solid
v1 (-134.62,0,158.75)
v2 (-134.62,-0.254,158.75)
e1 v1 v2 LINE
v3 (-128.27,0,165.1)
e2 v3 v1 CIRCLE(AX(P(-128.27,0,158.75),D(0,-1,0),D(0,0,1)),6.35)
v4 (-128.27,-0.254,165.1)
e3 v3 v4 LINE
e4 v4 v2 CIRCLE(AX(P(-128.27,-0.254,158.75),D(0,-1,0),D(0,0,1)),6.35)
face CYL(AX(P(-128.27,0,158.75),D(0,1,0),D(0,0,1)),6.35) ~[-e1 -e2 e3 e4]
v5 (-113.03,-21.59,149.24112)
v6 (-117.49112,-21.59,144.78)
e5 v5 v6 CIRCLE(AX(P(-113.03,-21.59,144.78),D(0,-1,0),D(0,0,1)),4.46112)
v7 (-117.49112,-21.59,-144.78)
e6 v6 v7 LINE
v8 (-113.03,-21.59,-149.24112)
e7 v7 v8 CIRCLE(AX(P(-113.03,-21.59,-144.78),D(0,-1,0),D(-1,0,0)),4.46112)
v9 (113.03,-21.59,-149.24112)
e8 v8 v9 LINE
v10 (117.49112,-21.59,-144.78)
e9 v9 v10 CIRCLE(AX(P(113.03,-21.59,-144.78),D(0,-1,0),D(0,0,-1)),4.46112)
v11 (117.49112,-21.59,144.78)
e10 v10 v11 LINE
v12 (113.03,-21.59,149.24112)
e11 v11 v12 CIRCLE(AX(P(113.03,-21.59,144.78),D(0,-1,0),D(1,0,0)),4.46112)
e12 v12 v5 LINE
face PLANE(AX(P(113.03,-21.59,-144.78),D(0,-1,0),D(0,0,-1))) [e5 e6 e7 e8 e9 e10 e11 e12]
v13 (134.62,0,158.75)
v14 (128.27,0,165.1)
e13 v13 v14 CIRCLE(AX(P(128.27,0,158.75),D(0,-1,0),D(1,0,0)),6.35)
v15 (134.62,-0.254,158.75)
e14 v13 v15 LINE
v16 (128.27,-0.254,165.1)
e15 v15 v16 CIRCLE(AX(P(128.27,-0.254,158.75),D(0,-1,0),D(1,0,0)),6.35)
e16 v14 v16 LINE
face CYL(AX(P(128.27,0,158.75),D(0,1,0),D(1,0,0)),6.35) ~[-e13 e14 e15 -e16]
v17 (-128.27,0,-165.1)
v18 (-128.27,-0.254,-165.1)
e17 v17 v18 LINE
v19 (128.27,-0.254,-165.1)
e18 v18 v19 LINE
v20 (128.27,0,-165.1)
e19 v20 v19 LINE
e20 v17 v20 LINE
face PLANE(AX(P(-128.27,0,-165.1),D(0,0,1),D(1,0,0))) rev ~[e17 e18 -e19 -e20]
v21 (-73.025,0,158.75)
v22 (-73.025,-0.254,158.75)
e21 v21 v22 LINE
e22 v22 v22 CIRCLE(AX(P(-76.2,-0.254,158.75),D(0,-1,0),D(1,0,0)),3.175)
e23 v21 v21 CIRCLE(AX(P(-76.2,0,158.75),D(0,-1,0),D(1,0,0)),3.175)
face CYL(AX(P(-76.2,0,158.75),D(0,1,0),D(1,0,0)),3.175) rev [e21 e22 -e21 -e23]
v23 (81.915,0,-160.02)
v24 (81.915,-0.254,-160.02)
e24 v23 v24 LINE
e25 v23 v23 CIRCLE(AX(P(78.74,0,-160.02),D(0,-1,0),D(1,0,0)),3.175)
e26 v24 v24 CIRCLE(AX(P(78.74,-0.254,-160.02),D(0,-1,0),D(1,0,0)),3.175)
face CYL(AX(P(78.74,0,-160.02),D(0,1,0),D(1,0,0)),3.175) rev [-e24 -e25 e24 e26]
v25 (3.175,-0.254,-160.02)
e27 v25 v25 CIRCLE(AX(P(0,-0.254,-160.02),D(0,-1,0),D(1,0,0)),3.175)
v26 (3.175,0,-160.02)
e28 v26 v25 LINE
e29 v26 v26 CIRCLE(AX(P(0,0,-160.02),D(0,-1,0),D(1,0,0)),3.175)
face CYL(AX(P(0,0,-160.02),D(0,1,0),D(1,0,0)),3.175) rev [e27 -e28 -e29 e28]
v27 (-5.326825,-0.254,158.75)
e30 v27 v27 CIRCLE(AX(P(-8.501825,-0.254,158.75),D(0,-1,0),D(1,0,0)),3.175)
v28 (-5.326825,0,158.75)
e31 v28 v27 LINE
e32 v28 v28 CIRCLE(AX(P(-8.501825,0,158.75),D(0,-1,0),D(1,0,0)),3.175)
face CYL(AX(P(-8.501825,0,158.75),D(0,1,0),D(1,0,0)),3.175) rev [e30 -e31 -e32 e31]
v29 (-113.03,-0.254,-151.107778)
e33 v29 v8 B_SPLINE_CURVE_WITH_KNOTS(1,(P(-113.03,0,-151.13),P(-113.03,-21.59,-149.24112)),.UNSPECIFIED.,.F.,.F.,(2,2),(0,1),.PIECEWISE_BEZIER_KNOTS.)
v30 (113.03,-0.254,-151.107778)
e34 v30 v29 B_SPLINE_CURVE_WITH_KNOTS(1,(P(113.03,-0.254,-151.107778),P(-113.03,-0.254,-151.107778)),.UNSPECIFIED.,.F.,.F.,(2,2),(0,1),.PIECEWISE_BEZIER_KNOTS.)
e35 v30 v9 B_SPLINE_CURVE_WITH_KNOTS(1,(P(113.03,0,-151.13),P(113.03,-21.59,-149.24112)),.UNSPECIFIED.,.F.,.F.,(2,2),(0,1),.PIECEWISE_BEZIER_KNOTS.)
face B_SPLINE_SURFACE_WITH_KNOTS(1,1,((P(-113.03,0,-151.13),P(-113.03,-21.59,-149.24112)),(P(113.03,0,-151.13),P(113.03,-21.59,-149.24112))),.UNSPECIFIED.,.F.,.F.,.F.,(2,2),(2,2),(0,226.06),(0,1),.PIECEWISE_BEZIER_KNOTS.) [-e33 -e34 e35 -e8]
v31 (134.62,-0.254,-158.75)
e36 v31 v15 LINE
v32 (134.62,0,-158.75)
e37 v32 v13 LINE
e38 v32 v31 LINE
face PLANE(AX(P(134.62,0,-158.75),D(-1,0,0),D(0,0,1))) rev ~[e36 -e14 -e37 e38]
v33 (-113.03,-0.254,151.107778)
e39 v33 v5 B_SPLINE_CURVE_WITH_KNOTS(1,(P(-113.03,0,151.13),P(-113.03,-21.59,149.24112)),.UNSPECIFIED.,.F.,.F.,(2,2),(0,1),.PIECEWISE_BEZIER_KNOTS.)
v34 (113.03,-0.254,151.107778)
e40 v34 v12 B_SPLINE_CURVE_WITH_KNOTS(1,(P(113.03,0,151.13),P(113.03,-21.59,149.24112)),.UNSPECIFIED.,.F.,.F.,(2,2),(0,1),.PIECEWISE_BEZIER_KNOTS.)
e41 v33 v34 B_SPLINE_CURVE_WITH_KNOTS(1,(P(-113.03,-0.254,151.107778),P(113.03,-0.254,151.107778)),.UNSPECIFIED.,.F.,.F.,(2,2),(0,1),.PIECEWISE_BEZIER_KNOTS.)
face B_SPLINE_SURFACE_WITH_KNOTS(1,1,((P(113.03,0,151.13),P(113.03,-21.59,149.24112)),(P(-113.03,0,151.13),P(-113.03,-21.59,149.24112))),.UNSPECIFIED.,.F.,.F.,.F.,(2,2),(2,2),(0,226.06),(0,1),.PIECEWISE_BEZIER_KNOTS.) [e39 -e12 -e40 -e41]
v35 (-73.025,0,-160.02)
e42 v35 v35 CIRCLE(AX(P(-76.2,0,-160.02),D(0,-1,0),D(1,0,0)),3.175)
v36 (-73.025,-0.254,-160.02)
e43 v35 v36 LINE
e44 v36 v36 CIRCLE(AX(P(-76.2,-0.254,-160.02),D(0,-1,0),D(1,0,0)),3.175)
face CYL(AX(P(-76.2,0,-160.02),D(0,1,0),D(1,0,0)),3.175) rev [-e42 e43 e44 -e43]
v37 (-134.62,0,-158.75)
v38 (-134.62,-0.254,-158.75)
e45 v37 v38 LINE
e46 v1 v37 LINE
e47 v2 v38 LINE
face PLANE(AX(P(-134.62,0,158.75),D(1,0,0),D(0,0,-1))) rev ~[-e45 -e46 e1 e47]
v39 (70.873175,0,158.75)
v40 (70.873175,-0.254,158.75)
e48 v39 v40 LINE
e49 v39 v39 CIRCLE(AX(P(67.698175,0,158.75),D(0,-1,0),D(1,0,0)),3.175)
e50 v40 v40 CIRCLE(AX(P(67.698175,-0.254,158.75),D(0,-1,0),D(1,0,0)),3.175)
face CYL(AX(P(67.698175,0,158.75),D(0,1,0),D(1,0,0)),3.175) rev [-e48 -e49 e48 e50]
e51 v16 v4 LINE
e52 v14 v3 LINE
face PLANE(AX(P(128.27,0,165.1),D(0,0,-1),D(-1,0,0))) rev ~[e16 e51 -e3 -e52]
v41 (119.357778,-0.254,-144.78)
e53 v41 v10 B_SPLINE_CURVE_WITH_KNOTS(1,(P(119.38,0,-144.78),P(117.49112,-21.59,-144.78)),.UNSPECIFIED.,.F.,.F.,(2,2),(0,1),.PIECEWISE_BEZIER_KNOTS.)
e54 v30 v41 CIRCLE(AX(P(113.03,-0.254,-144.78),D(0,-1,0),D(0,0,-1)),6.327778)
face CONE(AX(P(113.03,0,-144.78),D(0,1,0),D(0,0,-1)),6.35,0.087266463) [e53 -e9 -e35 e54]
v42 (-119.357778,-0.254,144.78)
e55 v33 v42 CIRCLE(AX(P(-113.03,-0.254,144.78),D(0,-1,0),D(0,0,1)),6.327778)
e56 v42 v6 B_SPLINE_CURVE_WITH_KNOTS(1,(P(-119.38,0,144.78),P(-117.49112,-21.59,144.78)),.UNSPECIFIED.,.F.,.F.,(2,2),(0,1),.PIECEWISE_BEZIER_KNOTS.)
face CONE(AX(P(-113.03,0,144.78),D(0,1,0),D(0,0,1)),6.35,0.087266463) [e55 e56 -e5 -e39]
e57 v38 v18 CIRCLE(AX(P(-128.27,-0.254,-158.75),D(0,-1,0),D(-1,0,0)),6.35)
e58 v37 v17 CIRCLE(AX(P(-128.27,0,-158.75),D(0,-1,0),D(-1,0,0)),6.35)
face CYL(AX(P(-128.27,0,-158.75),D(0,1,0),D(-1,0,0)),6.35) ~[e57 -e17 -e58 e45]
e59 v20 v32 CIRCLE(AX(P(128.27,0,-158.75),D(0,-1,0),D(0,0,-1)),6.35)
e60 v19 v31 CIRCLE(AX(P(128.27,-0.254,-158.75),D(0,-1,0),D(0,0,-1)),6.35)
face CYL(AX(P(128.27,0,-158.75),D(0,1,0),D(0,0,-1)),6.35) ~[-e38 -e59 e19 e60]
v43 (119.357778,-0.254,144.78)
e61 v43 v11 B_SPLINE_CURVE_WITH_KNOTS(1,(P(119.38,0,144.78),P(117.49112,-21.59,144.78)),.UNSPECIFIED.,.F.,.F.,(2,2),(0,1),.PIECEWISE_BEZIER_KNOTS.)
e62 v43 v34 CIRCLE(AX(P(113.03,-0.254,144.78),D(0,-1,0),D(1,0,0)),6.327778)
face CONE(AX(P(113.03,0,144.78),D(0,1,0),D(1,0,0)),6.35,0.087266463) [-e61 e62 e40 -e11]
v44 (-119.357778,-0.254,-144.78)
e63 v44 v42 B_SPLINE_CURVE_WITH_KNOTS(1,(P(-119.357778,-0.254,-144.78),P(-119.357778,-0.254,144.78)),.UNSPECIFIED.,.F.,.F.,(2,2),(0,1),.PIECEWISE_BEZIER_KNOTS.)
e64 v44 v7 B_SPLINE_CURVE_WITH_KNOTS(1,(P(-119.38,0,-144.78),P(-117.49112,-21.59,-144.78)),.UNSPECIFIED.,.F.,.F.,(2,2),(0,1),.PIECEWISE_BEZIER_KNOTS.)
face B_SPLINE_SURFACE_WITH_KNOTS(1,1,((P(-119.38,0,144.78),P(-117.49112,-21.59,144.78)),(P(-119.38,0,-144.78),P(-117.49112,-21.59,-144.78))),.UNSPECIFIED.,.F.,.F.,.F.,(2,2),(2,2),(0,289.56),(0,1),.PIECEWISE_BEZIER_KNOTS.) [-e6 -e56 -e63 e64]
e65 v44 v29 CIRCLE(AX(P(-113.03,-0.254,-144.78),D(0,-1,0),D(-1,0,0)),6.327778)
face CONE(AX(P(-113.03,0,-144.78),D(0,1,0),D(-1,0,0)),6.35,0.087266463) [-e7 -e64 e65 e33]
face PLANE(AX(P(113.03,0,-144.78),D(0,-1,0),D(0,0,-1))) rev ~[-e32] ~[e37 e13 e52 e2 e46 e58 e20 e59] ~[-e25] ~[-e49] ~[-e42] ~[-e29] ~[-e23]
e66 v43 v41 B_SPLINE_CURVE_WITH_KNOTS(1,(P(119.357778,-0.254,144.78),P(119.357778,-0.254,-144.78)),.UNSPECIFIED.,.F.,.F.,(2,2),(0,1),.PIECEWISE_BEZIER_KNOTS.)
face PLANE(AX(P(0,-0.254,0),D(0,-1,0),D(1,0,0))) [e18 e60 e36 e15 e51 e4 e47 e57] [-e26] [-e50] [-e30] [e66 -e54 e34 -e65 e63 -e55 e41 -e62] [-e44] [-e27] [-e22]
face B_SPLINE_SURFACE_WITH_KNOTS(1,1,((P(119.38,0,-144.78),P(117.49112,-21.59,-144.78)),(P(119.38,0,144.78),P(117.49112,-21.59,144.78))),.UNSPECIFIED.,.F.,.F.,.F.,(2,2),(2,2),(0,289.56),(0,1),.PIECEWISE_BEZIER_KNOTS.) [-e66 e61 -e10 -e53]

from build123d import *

# Parameters (mm, degrees)
F0_R     = 3.175
F1_DEPTH = 0.254
F2_DEPTH = 21.59
F2_TAPER = 5


# Not quite as in the source:
# - a feature names something its author has since deleted; it is built from what else it names


with BuildPart() as f1:
    # F0 (on Front) → F1 (new body)
    with BuildSketch(Plane.XZ):
        with BuildLine():
            Line((-128.27, -165.1), (128.27, -165.1))
            ThreePointArc((128.27, -165.1), (132.7601280605, -163.2401280605), (134.62, -158.75))
            Line((134.62, -158.75), (134.62, 158.75))
            ThreePointArc((134.62, 158.75), (132.7601280605, 163.2401280605), (128.27, 165.1))
            Line((128.27, 165.1), (-128.27, 165.1))
            ThreePointArc((-128.27, 165.1), (-132.7601280605, 163.2401280605), (-134.62, 158.75))
            Line((-134.62, 158.75), (-134.62, -158.75))
            ThreePointArc((-134.62, -158.75), (-132.7601280605, -163.2401280605), (-128.27, -165.1))
        make_face()
        with Locations((-76.2, -160.02)):
            Circle(F0_R, mode=Mode.SUBTRACT)
        with Locations((0, -160.02)):
            Circle(F0_R, mode=Mode.SUBTRACT)
        with Locations((78.74, -160.02)):
            Circle(F0_R, mode=Mode.SUBTRACT)
        with Locations((-76.2, 158.75)):
            Circle(F0_R, mode=Mode.SUBTRACT)
        with Locations((-8.5018249229, 158.75)):
            Circle(F0_R, mode=Mode.SUBTRACT)
        with BuildLine():
            ThreePointArc((119.38, -144.78), (117.5201280605, -149.2701280605), (113.03, -151.13))
            Line((113.03, -151.13), (76.2, -151.13))
            Line((76.2, -151.13), (-76.2, -151.13))
            Line((-76.2, -151.13), (-113.03, -151.13))
            ThreePointArc((-113.03, -151.13), (-117.5201280605, -149.2701280605), (-119.38, -144.78))
            Line((-119.38, -144.78), (-119.38, 144.78))
            ThreePointArc((-119.38, 144.78), (-117.5201280605, 149.2701280605), (-113.03, 151.13))
            Line((-113.03, 151.13), (-76.2, 151.13))
            Line((-76.2, 151.13), (76.2, 151.13))
            Line((76.2, 151.13), (113.03, 151.13))
            ThreePointArc((113.03, 151.13), (117.5201280605, 149.2701280605), (119.38, 144.78))
            Line((119.38, 144.78), (119.38, -144.78))
        make_face(mode=Mode.SUBTRACT)
        with Locations((67.6981750771, 158.75)):
            Circle(F0_R, mode=Mode.SUBTRACT)
        with BuildLine():
            Line((76.2, -151.13), (113.03, -151.13))
            ThreePointArc((113.03, -151.13), (117.5201280605, -149.2701280605), (119.38, -144.78))
            Line((119.38, -144.78), (119.38, 144.78))
            ThreePointArc((119.38, 144.78), (117.5201280605, 149.2701280605), (113.03, 151.13))
            Line((113.03, 151.13), (76.2, 151.13))
            Line((76.2, 151.13), (-76.2, 151.13))
            Line((-76.2, 151.13), (-113.03, 151.13))
            ThreePointArc((-113.03, 151.13), (-117.5201280605, 149.2701280605), (-119.38, 144.78))
            Line((-119.38, 144.78), (-119.38, -144.78))
            ThreePointArc((-119.38, -144.78), (-117.5201280605, -149.2701280605), (-113.03, -151.13))
            Line((-113.03, -151.13), (-76.2, -151.13))
            Line((-76.2, -151.13), (76.2, -151.13))
        make_face()
    extrude(amount=F1_DEPTH)

    # F0 (on Front) → F2 (join)
    with BuildSketch(Plane.XZ):
        with BuildLine():
            Line((76.2, -151.13), (113.03, -151.13))
            ThreePointArc((113.03, -151.13), (117.5201280605, -149.2701280605), (119.38, -144.78))
            Line((119.38, -144.78), (119.38, 144.78))
            ThreePointArc((119.38, 144.78), (117.5201280605, 149.2701280605), (113.03, 151.13))
            Line((113.03, 151.13), (76.2, 151.13))
            Line((76.2, 151.13), (-76.2, 151.13))
            Line((-76.2, 151.13), (-113.03, 151.13))
            ThreePointArc((-113.03, 151.13), (-117.5201280605, 149.2701280605), (-119.38, 144.78))
            Line((-119.38, 144.78), (-119.38, -144.78))
            ThreePointArc((-119.38, -144.78), (-117.5201280605, -149.2701280605), (-113.03, -151.13))
            Line((-113.03, -151.13), (-76.2, -151.13))
            Line((-76.2, -151.13), (76.2, -151.13))
        make_face()
    extrude(amount=F2_DEPTH, taper=F2_TAPER)


solid = f1.part
